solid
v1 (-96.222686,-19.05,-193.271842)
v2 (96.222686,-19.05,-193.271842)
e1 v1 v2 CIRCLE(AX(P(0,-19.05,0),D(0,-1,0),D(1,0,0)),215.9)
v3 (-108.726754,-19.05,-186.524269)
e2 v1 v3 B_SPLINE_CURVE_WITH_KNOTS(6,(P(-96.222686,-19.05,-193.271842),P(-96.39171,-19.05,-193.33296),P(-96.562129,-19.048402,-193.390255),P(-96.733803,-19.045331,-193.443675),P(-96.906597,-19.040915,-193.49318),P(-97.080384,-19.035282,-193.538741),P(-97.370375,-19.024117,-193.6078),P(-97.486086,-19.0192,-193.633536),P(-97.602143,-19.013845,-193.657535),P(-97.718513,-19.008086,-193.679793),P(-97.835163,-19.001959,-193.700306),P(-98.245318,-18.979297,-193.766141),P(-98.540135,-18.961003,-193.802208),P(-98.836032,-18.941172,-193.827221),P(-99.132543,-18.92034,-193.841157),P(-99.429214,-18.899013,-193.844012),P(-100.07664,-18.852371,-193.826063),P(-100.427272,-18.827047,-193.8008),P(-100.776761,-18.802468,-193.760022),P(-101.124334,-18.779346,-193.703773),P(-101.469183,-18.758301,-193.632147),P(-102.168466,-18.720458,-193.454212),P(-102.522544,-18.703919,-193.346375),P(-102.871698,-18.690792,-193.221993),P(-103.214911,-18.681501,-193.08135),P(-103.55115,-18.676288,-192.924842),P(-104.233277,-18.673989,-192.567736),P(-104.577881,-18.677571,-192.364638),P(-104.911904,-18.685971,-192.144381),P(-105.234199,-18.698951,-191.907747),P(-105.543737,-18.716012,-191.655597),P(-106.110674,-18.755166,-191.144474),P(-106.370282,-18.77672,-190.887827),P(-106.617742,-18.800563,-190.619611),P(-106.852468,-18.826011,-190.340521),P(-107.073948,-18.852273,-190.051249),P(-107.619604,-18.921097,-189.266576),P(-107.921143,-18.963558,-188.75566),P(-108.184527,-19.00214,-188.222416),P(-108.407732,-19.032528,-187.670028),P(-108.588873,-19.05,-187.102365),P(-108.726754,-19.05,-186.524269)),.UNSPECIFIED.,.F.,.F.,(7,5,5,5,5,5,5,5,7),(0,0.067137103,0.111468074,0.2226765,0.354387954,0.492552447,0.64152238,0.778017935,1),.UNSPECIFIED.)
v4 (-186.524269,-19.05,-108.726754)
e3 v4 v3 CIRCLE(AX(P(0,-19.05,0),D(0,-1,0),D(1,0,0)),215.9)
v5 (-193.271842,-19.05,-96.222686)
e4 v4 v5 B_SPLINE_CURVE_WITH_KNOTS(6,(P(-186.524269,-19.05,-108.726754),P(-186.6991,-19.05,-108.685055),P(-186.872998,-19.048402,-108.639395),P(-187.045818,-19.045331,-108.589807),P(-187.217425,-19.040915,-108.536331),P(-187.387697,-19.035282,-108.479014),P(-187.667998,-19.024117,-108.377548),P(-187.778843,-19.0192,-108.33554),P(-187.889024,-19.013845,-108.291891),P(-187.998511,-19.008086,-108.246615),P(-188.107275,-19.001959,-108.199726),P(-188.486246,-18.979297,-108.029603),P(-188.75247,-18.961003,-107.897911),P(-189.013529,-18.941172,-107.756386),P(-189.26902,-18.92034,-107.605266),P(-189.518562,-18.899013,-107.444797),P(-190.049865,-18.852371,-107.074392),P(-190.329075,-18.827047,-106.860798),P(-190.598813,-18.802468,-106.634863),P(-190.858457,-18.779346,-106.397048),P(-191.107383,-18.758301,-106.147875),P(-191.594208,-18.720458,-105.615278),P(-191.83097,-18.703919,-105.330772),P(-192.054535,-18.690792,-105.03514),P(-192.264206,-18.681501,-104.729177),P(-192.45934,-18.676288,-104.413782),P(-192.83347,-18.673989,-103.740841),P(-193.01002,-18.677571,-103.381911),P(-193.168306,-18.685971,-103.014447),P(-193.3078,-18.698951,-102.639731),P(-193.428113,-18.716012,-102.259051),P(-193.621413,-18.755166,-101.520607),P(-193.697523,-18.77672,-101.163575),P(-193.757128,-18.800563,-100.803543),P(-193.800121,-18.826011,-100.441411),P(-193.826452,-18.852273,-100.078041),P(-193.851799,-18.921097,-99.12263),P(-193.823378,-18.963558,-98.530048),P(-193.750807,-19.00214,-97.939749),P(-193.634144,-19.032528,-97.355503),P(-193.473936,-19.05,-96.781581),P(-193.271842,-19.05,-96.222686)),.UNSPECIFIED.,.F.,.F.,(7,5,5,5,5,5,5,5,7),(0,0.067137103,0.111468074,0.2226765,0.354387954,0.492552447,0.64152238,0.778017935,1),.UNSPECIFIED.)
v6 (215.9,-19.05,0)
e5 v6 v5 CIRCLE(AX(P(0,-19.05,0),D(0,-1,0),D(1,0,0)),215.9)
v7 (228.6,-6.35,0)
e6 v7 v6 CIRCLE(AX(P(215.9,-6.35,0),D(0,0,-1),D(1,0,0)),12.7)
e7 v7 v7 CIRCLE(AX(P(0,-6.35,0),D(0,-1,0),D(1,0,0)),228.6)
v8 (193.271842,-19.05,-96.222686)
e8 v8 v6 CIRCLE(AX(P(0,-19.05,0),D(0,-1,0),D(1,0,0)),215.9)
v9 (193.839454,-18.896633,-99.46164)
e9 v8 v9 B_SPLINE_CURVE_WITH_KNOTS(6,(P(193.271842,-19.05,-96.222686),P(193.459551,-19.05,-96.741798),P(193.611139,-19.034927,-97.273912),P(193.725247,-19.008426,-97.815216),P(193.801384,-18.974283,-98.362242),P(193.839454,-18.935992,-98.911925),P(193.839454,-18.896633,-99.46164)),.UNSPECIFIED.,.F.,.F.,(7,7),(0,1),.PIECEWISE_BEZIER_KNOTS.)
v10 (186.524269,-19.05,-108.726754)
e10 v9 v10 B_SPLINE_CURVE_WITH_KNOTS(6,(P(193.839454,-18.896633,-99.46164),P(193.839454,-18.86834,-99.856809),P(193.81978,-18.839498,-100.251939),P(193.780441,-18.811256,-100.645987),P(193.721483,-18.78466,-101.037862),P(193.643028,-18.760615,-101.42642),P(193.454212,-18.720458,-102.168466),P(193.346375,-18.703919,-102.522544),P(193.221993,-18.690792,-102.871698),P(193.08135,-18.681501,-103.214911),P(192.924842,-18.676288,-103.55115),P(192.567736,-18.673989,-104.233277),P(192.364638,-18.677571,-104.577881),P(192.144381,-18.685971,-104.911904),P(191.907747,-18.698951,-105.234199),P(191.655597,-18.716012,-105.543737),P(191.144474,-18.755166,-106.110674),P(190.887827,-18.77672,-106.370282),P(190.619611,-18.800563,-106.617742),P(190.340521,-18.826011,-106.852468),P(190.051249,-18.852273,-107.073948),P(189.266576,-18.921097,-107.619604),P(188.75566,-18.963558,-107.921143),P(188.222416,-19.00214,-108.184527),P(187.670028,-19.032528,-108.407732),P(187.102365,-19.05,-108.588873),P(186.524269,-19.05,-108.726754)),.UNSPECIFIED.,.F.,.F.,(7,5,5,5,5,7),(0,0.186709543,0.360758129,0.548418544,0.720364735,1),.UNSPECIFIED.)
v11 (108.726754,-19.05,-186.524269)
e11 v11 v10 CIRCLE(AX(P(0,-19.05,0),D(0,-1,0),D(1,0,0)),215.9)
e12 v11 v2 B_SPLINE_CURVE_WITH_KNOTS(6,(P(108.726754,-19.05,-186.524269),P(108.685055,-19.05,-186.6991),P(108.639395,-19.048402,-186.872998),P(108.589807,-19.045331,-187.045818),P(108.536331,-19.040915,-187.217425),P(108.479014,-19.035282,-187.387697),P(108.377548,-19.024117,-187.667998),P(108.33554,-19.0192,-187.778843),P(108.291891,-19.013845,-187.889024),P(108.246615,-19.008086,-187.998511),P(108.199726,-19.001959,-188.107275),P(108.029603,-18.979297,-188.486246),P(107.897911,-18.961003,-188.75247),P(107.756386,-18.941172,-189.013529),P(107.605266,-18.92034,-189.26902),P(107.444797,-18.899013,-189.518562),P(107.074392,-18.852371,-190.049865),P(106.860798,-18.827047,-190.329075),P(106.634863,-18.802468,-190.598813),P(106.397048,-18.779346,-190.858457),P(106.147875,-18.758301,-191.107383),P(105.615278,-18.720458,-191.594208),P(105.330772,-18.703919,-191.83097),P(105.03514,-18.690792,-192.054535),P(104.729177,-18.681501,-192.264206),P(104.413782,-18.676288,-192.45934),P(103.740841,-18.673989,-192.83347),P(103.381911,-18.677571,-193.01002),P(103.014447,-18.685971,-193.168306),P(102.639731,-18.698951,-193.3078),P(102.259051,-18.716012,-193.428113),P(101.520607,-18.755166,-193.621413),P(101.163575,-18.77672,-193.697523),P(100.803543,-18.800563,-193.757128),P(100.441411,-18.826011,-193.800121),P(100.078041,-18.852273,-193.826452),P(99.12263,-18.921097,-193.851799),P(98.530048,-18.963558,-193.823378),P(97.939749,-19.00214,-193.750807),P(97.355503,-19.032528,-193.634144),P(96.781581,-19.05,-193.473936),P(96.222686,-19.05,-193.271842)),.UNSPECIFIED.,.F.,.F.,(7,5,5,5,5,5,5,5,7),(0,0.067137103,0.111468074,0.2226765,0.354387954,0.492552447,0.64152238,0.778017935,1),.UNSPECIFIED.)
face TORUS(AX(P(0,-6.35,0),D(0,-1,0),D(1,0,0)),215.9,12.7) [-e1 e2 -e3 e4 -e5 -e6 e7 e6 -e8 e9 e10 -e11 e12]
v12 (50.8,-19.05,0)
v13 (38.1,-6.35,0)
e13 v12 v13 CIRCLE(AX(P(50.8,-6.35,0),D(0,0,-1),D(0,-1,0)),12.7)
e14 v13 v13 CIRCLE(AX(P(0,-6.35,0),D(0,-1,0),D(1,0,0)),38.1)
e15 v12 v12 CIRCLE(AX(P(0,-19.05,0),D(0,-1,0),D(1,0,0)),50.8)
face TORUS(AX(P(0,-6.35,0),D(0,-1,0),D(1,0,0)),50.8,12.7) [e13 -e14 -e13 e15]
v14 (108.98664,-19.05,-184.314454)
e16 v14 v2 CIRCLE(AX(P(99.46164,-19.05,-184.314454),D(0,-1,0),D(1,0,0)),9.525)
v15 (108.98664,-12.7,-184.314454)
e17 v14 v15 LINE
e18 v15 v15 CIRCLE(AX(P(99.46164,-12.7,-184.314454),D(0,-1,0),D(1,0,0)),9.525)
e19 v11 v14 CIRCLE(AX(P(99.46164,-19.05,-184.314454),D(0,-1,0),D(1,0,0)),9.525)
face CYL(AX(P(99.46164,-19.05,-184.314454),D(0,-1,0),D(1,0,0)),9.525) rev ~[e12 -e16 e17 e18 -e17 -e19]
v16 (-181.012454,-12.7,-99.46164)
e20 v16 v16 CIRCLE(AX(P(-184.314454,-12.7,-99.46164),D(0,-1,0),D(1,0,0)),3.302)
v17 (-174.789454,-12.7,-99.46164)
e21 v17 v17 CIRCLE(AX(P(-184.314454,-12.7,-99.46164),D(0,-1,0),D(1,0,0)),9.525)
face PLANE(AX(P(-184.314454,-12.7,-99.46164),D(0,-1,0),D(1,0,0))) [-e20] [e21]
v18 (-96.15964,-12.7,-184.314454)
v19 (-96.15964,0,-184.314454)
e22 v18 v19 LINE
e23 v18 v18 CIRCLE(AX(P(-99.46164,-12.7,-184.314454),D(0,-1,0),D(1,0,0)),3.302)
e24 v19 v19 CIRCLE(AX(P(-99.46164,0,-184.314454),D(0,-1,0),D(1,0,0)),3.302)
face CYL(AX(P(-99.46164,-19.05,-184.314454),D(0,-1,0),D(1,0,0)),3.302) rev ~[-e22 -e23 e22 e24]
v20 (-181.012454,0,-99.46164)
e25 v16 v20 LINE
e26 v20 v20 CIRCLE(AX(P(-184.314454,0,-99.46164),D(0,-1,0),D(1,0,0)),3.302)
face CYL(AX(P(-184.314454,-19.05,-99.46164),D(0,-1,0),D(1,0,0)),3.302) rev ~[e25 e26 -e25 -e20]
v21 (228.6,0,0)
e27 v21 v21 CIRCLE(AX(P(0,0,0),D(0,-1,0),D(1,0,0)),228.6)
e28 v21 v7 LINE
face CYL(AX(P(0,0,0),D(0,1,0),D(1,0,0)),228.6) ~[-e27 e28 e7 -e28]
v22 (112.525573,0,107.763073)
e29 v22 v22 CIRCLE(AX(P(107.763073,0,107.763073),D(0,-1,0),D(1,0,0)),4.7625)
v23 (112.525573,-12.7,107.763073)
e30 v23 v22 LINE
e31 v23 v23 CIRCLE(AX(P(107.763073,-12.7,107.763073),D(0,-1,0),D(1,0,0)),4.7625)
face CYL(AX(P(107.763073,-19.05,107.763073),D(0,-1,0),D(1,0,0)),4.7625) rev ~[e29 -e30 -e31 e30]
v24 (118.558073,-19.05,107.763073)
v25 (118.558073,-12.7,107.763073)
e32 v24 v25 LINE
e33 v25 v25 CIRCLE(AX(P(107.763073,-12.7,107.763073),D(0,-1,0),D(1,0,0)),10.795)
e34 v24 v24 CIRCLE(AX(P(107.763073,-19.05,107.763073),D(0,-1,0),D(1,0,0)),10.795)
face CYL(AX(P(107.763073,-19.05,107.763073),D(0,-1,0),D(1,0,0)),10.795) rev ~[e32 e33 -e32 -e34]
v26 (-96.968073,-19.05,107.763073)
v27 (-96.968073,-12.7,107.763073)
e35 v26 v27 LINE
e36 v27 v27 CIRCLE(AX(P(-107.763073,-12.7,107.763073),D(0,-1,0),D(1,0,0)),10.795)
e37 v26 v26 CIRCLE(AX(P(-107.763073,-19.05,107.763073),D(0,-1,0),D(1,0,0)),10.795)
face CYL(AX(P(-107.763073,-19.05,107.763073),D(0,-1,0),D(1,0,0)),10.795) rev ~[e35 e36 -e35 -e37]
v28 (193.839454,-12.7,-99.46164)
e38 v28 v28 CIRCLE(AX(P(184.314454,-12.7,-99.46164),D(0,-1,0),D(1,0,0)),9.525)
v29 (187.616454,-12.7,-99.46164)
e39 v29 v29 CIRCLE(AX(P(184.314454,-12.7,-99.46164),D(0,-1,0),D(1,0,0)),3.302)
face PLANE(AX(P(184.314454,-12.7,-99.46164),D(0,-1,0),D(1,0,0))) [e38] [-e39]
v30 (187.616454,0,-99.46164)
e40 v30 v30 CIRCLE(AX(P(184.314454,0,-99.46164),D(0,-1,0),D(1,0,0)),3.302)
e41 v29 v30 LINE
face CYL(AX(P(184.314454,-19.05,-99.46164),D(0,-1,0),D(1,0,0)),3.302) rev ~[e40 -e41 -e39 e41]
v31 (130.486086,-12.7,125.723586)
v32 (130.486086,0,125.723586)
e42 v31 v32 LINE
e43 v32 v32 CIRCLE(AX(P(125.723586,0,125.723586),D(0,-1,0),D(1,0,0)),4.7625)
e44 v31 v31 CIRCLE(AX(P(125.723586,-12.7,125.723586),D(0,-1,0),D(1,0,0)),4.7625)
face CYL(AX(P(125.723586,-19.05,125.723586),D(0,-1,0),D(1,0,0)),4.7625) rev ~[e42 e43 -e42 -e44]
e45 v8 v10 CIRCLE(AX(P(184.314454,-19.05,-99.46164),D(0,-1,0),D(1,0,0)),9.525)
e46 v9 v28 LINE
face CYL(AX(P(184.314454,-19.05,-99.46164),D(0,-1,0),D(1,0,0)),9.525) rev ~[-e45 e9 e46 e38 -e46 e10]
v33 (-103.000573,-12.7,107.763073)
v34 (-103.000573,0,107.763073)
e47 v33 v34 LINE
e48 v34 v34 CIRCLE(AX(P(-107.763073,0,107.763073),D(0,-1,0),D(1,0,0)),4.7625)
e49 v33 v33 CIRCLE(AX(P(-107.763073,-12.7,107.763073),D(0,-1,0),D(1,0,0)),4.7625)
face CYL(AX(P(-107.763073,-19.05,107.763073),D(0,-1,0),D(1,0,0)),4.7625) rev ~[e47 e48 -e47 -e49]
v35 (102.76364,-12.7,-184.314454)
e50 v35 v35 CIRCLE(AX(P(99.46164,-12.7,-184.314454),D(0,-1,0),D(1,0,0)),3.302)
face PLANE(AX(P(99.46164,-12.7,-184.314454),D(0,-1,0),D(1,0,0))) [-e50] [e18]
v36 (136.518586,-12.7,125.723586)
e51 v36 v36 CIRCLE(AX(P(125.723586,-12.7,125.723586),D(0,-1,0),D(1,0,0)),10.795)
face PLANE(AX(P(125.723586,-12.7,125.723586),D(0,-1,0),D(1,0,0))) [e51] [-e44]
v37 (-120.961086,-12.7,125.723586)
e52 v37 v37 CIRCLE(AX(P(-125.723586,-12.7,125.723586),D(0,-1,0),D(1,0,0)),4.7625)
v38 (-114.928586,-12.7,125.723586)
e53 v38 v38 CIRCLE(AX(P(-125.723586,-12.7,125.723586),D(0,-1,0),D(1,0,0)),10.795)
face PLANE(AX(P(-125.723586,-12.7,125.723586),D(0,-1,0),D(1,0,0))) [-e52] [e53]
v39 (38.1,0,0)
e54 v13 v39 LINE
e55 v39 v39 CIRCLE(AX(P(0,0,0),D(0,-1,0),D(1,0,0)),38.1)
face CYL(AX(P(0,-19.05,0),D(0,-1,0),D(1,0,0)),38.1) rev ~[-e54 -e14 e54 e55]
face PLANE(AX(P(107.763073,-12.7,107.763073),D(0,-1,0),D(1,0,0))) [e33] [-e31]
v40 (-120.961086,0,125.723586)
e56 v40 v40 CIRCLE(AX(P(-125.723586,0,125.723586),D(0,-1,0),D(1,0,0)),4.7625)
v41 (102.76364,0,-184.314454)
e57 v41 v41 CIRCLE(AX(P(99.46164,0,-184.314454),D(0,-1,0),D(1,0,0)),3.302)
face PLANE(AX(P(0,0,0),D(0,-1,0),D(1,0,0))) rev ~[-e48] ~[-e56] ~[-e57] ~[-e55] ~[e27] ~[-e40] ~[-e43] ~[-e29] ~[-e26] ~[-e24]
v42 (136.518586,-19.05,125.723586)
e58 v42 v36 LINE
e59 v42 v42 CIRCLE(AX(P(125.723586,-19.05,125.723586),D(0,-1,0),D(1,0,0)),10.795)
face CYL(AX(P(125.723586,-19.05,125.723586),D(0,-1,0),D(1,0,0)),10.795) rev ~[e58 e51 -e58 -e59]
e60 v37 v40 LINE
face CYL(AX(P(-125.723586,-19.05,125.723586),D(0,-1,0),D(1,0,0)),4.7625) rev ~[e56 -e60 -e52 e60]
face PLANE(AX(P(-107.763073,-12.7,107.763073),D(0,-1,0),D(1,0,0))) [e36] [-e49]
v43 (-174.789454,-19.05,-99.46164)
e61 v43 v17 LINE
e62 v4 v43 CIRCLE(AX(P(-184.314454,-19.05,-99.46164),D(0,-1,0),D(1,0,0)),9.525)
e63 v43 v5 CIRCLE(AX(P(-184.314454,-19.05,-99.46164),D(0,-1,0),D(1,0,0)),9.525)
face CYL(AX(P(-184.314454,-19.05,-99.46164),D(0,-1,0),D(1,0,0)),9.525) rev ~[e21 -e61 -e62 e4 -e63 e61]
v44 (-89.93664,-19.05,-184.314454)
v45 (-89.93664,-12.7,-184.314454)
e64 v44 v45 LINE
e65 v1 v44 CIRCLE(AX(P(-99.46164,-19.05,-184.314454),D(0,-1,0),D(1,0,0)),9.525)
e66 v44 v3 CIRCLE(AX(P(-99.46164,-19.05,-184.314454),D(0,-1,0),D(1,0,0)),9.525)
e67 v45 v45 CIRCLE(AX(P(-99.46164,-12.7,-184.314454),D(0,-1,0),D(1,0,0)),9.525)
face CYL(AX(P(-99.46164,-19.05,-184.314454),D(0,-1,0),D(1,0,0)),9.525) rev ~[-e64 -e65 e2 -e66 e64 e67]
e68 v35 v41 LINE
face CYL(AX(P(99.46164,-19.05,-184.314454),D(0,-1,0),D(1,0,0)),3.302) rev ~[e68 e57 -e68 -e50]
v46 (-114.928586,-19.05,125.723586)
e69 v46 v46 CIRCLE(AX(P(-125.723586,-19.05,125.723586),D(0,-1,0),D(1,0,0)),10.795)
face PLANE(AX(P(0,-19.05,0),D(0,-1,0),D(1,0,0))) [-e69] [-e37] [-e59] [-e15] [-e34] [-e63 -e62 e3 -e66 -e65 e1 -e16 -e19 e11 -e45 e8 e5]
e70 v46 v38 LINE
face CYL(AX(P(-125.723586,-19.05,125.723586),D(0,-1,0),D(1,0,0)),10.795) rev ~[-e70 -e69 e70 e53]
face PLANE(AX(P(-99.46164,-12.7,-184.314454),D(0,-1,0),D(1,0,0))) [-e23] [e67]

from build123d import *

# Parameters (mm, degrees)
F0_R     = 228.6
F1_DEPTH = 19.05
F2_R     = 38.1
F3_DEPTH = 19.051
F4_R     = 4.7625
F4_R_2   = 3.302
F5_DEPTH = 19.051
F6_R     = 10.795
F6_R_2   = 9.525
F7_DEPTH = 6.35


# Not quite as in the source:
# - a fillet or chamfer that OpenCascade refuses, or shapes differently, is made with other operations: its cross-section is extruded or revolved along the edge and cut away or added


with BuildPart() as f1:
    # F0 (on Front) → F1 (new body)
    with BuildSketch(Plane.XZ):
        Circle(F0_R)
    extrude(amount=F1_DEPTH)

    # F2 (on face) → F3 (cut, through all)
    with BuildSketch(Plane.XZ.offset(19.05)):
        Circle(F2_R)
    extrude(amount=-F3_DEPTH, mode=Mode.SUBTRACT)

    # F4 (on face) → F5 (cut, through all)
    with BuildSketch(Plane.XZ.offset(19.05)):
        with Locations((107.7630734528, 107.7630734528)):
            Circle(F4_R)
        with Locations((125.723585695, 125.723585695)):
            Circle(F4_R)
        with Locations((-107.7630734528, 107.7630734528)):
            Circle(F4_R)
        with Locations((-125.723585695, 125.723585695)):
            Circle(F4_R)
        with Locations((-99.4616398417, -184.3144535841)):
            Circle(F4_R_2)
        with Locations((-184.3144535841, -99.4616398417)):
            Circle(F4_R_2)
        with Locations((99.4616398417, -184.3144535841)):
            Circle(F4_R_2)
        with Locations((184.3144535841, -99.4616398417)):
            Circle(F4_R_2)
    extrude(amount=-F5_DEPTH, mode=Mode.SUBTRACT)

    # F6 (on face) → F7 (cut)
    with BuildSketch(Plane.XZ.offset(19.05)):
        with Locations((107.7630734528, 107.7630734528)):
            Circle(F6_R)
        with Locations((125.723585695, 125.723585695)):
            Circle(F6_R)
        with Locations((-125.723585695, 125.723585695)):
            Circle(F6_R)
        with Locations((-107.7630734528, 107.7630734528)):
            Circle(F6_R)
        with Locations((-184.3144535841, -99.4616398417)):
            Circle(F6_R_2)
        with Locations((-99.4616398417, -184.3144535841)):
            Circle(F6_R_2)
        with Locations((99.4616398417, -184.3144535841)):
            Circle(F6_R_2)
        with Locations((184.3144535841, -99.4616398417)):
            Circle(F6_R_2)
    extrude(amount=-F7_DEPTH, mode=Mode.SUBTRACT)

    # F8: fillet of radius 12.7 on 2 edges, made by hand

    # F8_s1 → F8_t2 (revolve, cut)
    with BuildSketch(Plane.XY):
        with BuildLine():
            ThreePointArc((228.6, -6.35), (224.8802561211, -15.3302561211), (215.9, -19.05))
            Line((215.9, -19.05), (228.6, -19.05))
            Line((228.6, -19.05), (228.6, -6.35))
        make_face()
    revolve(axis=Axis((0, -19.05, 0), (0, -1, 0)), mode=Mode.SUBTRACT)

    # F8_s3 → F8_t4 (revolve, cut)
    with BuildSketch(Plane.XY):
        with BuildLine():
            ThreePointArc((50.8, -19.05), (41.8197438789, -15.3302561211), (38.1, -6.35))
            Line((38.1, -6.35), (38.1, -19.05))
            Line((38.1, -19.05), (50.8, -19.05))
        make_face()
    revolve(axis=Axis((0, -19.05, 0), (0, -1, 0)), mode=Mode.SUBTRACT)


solid = f1.part
